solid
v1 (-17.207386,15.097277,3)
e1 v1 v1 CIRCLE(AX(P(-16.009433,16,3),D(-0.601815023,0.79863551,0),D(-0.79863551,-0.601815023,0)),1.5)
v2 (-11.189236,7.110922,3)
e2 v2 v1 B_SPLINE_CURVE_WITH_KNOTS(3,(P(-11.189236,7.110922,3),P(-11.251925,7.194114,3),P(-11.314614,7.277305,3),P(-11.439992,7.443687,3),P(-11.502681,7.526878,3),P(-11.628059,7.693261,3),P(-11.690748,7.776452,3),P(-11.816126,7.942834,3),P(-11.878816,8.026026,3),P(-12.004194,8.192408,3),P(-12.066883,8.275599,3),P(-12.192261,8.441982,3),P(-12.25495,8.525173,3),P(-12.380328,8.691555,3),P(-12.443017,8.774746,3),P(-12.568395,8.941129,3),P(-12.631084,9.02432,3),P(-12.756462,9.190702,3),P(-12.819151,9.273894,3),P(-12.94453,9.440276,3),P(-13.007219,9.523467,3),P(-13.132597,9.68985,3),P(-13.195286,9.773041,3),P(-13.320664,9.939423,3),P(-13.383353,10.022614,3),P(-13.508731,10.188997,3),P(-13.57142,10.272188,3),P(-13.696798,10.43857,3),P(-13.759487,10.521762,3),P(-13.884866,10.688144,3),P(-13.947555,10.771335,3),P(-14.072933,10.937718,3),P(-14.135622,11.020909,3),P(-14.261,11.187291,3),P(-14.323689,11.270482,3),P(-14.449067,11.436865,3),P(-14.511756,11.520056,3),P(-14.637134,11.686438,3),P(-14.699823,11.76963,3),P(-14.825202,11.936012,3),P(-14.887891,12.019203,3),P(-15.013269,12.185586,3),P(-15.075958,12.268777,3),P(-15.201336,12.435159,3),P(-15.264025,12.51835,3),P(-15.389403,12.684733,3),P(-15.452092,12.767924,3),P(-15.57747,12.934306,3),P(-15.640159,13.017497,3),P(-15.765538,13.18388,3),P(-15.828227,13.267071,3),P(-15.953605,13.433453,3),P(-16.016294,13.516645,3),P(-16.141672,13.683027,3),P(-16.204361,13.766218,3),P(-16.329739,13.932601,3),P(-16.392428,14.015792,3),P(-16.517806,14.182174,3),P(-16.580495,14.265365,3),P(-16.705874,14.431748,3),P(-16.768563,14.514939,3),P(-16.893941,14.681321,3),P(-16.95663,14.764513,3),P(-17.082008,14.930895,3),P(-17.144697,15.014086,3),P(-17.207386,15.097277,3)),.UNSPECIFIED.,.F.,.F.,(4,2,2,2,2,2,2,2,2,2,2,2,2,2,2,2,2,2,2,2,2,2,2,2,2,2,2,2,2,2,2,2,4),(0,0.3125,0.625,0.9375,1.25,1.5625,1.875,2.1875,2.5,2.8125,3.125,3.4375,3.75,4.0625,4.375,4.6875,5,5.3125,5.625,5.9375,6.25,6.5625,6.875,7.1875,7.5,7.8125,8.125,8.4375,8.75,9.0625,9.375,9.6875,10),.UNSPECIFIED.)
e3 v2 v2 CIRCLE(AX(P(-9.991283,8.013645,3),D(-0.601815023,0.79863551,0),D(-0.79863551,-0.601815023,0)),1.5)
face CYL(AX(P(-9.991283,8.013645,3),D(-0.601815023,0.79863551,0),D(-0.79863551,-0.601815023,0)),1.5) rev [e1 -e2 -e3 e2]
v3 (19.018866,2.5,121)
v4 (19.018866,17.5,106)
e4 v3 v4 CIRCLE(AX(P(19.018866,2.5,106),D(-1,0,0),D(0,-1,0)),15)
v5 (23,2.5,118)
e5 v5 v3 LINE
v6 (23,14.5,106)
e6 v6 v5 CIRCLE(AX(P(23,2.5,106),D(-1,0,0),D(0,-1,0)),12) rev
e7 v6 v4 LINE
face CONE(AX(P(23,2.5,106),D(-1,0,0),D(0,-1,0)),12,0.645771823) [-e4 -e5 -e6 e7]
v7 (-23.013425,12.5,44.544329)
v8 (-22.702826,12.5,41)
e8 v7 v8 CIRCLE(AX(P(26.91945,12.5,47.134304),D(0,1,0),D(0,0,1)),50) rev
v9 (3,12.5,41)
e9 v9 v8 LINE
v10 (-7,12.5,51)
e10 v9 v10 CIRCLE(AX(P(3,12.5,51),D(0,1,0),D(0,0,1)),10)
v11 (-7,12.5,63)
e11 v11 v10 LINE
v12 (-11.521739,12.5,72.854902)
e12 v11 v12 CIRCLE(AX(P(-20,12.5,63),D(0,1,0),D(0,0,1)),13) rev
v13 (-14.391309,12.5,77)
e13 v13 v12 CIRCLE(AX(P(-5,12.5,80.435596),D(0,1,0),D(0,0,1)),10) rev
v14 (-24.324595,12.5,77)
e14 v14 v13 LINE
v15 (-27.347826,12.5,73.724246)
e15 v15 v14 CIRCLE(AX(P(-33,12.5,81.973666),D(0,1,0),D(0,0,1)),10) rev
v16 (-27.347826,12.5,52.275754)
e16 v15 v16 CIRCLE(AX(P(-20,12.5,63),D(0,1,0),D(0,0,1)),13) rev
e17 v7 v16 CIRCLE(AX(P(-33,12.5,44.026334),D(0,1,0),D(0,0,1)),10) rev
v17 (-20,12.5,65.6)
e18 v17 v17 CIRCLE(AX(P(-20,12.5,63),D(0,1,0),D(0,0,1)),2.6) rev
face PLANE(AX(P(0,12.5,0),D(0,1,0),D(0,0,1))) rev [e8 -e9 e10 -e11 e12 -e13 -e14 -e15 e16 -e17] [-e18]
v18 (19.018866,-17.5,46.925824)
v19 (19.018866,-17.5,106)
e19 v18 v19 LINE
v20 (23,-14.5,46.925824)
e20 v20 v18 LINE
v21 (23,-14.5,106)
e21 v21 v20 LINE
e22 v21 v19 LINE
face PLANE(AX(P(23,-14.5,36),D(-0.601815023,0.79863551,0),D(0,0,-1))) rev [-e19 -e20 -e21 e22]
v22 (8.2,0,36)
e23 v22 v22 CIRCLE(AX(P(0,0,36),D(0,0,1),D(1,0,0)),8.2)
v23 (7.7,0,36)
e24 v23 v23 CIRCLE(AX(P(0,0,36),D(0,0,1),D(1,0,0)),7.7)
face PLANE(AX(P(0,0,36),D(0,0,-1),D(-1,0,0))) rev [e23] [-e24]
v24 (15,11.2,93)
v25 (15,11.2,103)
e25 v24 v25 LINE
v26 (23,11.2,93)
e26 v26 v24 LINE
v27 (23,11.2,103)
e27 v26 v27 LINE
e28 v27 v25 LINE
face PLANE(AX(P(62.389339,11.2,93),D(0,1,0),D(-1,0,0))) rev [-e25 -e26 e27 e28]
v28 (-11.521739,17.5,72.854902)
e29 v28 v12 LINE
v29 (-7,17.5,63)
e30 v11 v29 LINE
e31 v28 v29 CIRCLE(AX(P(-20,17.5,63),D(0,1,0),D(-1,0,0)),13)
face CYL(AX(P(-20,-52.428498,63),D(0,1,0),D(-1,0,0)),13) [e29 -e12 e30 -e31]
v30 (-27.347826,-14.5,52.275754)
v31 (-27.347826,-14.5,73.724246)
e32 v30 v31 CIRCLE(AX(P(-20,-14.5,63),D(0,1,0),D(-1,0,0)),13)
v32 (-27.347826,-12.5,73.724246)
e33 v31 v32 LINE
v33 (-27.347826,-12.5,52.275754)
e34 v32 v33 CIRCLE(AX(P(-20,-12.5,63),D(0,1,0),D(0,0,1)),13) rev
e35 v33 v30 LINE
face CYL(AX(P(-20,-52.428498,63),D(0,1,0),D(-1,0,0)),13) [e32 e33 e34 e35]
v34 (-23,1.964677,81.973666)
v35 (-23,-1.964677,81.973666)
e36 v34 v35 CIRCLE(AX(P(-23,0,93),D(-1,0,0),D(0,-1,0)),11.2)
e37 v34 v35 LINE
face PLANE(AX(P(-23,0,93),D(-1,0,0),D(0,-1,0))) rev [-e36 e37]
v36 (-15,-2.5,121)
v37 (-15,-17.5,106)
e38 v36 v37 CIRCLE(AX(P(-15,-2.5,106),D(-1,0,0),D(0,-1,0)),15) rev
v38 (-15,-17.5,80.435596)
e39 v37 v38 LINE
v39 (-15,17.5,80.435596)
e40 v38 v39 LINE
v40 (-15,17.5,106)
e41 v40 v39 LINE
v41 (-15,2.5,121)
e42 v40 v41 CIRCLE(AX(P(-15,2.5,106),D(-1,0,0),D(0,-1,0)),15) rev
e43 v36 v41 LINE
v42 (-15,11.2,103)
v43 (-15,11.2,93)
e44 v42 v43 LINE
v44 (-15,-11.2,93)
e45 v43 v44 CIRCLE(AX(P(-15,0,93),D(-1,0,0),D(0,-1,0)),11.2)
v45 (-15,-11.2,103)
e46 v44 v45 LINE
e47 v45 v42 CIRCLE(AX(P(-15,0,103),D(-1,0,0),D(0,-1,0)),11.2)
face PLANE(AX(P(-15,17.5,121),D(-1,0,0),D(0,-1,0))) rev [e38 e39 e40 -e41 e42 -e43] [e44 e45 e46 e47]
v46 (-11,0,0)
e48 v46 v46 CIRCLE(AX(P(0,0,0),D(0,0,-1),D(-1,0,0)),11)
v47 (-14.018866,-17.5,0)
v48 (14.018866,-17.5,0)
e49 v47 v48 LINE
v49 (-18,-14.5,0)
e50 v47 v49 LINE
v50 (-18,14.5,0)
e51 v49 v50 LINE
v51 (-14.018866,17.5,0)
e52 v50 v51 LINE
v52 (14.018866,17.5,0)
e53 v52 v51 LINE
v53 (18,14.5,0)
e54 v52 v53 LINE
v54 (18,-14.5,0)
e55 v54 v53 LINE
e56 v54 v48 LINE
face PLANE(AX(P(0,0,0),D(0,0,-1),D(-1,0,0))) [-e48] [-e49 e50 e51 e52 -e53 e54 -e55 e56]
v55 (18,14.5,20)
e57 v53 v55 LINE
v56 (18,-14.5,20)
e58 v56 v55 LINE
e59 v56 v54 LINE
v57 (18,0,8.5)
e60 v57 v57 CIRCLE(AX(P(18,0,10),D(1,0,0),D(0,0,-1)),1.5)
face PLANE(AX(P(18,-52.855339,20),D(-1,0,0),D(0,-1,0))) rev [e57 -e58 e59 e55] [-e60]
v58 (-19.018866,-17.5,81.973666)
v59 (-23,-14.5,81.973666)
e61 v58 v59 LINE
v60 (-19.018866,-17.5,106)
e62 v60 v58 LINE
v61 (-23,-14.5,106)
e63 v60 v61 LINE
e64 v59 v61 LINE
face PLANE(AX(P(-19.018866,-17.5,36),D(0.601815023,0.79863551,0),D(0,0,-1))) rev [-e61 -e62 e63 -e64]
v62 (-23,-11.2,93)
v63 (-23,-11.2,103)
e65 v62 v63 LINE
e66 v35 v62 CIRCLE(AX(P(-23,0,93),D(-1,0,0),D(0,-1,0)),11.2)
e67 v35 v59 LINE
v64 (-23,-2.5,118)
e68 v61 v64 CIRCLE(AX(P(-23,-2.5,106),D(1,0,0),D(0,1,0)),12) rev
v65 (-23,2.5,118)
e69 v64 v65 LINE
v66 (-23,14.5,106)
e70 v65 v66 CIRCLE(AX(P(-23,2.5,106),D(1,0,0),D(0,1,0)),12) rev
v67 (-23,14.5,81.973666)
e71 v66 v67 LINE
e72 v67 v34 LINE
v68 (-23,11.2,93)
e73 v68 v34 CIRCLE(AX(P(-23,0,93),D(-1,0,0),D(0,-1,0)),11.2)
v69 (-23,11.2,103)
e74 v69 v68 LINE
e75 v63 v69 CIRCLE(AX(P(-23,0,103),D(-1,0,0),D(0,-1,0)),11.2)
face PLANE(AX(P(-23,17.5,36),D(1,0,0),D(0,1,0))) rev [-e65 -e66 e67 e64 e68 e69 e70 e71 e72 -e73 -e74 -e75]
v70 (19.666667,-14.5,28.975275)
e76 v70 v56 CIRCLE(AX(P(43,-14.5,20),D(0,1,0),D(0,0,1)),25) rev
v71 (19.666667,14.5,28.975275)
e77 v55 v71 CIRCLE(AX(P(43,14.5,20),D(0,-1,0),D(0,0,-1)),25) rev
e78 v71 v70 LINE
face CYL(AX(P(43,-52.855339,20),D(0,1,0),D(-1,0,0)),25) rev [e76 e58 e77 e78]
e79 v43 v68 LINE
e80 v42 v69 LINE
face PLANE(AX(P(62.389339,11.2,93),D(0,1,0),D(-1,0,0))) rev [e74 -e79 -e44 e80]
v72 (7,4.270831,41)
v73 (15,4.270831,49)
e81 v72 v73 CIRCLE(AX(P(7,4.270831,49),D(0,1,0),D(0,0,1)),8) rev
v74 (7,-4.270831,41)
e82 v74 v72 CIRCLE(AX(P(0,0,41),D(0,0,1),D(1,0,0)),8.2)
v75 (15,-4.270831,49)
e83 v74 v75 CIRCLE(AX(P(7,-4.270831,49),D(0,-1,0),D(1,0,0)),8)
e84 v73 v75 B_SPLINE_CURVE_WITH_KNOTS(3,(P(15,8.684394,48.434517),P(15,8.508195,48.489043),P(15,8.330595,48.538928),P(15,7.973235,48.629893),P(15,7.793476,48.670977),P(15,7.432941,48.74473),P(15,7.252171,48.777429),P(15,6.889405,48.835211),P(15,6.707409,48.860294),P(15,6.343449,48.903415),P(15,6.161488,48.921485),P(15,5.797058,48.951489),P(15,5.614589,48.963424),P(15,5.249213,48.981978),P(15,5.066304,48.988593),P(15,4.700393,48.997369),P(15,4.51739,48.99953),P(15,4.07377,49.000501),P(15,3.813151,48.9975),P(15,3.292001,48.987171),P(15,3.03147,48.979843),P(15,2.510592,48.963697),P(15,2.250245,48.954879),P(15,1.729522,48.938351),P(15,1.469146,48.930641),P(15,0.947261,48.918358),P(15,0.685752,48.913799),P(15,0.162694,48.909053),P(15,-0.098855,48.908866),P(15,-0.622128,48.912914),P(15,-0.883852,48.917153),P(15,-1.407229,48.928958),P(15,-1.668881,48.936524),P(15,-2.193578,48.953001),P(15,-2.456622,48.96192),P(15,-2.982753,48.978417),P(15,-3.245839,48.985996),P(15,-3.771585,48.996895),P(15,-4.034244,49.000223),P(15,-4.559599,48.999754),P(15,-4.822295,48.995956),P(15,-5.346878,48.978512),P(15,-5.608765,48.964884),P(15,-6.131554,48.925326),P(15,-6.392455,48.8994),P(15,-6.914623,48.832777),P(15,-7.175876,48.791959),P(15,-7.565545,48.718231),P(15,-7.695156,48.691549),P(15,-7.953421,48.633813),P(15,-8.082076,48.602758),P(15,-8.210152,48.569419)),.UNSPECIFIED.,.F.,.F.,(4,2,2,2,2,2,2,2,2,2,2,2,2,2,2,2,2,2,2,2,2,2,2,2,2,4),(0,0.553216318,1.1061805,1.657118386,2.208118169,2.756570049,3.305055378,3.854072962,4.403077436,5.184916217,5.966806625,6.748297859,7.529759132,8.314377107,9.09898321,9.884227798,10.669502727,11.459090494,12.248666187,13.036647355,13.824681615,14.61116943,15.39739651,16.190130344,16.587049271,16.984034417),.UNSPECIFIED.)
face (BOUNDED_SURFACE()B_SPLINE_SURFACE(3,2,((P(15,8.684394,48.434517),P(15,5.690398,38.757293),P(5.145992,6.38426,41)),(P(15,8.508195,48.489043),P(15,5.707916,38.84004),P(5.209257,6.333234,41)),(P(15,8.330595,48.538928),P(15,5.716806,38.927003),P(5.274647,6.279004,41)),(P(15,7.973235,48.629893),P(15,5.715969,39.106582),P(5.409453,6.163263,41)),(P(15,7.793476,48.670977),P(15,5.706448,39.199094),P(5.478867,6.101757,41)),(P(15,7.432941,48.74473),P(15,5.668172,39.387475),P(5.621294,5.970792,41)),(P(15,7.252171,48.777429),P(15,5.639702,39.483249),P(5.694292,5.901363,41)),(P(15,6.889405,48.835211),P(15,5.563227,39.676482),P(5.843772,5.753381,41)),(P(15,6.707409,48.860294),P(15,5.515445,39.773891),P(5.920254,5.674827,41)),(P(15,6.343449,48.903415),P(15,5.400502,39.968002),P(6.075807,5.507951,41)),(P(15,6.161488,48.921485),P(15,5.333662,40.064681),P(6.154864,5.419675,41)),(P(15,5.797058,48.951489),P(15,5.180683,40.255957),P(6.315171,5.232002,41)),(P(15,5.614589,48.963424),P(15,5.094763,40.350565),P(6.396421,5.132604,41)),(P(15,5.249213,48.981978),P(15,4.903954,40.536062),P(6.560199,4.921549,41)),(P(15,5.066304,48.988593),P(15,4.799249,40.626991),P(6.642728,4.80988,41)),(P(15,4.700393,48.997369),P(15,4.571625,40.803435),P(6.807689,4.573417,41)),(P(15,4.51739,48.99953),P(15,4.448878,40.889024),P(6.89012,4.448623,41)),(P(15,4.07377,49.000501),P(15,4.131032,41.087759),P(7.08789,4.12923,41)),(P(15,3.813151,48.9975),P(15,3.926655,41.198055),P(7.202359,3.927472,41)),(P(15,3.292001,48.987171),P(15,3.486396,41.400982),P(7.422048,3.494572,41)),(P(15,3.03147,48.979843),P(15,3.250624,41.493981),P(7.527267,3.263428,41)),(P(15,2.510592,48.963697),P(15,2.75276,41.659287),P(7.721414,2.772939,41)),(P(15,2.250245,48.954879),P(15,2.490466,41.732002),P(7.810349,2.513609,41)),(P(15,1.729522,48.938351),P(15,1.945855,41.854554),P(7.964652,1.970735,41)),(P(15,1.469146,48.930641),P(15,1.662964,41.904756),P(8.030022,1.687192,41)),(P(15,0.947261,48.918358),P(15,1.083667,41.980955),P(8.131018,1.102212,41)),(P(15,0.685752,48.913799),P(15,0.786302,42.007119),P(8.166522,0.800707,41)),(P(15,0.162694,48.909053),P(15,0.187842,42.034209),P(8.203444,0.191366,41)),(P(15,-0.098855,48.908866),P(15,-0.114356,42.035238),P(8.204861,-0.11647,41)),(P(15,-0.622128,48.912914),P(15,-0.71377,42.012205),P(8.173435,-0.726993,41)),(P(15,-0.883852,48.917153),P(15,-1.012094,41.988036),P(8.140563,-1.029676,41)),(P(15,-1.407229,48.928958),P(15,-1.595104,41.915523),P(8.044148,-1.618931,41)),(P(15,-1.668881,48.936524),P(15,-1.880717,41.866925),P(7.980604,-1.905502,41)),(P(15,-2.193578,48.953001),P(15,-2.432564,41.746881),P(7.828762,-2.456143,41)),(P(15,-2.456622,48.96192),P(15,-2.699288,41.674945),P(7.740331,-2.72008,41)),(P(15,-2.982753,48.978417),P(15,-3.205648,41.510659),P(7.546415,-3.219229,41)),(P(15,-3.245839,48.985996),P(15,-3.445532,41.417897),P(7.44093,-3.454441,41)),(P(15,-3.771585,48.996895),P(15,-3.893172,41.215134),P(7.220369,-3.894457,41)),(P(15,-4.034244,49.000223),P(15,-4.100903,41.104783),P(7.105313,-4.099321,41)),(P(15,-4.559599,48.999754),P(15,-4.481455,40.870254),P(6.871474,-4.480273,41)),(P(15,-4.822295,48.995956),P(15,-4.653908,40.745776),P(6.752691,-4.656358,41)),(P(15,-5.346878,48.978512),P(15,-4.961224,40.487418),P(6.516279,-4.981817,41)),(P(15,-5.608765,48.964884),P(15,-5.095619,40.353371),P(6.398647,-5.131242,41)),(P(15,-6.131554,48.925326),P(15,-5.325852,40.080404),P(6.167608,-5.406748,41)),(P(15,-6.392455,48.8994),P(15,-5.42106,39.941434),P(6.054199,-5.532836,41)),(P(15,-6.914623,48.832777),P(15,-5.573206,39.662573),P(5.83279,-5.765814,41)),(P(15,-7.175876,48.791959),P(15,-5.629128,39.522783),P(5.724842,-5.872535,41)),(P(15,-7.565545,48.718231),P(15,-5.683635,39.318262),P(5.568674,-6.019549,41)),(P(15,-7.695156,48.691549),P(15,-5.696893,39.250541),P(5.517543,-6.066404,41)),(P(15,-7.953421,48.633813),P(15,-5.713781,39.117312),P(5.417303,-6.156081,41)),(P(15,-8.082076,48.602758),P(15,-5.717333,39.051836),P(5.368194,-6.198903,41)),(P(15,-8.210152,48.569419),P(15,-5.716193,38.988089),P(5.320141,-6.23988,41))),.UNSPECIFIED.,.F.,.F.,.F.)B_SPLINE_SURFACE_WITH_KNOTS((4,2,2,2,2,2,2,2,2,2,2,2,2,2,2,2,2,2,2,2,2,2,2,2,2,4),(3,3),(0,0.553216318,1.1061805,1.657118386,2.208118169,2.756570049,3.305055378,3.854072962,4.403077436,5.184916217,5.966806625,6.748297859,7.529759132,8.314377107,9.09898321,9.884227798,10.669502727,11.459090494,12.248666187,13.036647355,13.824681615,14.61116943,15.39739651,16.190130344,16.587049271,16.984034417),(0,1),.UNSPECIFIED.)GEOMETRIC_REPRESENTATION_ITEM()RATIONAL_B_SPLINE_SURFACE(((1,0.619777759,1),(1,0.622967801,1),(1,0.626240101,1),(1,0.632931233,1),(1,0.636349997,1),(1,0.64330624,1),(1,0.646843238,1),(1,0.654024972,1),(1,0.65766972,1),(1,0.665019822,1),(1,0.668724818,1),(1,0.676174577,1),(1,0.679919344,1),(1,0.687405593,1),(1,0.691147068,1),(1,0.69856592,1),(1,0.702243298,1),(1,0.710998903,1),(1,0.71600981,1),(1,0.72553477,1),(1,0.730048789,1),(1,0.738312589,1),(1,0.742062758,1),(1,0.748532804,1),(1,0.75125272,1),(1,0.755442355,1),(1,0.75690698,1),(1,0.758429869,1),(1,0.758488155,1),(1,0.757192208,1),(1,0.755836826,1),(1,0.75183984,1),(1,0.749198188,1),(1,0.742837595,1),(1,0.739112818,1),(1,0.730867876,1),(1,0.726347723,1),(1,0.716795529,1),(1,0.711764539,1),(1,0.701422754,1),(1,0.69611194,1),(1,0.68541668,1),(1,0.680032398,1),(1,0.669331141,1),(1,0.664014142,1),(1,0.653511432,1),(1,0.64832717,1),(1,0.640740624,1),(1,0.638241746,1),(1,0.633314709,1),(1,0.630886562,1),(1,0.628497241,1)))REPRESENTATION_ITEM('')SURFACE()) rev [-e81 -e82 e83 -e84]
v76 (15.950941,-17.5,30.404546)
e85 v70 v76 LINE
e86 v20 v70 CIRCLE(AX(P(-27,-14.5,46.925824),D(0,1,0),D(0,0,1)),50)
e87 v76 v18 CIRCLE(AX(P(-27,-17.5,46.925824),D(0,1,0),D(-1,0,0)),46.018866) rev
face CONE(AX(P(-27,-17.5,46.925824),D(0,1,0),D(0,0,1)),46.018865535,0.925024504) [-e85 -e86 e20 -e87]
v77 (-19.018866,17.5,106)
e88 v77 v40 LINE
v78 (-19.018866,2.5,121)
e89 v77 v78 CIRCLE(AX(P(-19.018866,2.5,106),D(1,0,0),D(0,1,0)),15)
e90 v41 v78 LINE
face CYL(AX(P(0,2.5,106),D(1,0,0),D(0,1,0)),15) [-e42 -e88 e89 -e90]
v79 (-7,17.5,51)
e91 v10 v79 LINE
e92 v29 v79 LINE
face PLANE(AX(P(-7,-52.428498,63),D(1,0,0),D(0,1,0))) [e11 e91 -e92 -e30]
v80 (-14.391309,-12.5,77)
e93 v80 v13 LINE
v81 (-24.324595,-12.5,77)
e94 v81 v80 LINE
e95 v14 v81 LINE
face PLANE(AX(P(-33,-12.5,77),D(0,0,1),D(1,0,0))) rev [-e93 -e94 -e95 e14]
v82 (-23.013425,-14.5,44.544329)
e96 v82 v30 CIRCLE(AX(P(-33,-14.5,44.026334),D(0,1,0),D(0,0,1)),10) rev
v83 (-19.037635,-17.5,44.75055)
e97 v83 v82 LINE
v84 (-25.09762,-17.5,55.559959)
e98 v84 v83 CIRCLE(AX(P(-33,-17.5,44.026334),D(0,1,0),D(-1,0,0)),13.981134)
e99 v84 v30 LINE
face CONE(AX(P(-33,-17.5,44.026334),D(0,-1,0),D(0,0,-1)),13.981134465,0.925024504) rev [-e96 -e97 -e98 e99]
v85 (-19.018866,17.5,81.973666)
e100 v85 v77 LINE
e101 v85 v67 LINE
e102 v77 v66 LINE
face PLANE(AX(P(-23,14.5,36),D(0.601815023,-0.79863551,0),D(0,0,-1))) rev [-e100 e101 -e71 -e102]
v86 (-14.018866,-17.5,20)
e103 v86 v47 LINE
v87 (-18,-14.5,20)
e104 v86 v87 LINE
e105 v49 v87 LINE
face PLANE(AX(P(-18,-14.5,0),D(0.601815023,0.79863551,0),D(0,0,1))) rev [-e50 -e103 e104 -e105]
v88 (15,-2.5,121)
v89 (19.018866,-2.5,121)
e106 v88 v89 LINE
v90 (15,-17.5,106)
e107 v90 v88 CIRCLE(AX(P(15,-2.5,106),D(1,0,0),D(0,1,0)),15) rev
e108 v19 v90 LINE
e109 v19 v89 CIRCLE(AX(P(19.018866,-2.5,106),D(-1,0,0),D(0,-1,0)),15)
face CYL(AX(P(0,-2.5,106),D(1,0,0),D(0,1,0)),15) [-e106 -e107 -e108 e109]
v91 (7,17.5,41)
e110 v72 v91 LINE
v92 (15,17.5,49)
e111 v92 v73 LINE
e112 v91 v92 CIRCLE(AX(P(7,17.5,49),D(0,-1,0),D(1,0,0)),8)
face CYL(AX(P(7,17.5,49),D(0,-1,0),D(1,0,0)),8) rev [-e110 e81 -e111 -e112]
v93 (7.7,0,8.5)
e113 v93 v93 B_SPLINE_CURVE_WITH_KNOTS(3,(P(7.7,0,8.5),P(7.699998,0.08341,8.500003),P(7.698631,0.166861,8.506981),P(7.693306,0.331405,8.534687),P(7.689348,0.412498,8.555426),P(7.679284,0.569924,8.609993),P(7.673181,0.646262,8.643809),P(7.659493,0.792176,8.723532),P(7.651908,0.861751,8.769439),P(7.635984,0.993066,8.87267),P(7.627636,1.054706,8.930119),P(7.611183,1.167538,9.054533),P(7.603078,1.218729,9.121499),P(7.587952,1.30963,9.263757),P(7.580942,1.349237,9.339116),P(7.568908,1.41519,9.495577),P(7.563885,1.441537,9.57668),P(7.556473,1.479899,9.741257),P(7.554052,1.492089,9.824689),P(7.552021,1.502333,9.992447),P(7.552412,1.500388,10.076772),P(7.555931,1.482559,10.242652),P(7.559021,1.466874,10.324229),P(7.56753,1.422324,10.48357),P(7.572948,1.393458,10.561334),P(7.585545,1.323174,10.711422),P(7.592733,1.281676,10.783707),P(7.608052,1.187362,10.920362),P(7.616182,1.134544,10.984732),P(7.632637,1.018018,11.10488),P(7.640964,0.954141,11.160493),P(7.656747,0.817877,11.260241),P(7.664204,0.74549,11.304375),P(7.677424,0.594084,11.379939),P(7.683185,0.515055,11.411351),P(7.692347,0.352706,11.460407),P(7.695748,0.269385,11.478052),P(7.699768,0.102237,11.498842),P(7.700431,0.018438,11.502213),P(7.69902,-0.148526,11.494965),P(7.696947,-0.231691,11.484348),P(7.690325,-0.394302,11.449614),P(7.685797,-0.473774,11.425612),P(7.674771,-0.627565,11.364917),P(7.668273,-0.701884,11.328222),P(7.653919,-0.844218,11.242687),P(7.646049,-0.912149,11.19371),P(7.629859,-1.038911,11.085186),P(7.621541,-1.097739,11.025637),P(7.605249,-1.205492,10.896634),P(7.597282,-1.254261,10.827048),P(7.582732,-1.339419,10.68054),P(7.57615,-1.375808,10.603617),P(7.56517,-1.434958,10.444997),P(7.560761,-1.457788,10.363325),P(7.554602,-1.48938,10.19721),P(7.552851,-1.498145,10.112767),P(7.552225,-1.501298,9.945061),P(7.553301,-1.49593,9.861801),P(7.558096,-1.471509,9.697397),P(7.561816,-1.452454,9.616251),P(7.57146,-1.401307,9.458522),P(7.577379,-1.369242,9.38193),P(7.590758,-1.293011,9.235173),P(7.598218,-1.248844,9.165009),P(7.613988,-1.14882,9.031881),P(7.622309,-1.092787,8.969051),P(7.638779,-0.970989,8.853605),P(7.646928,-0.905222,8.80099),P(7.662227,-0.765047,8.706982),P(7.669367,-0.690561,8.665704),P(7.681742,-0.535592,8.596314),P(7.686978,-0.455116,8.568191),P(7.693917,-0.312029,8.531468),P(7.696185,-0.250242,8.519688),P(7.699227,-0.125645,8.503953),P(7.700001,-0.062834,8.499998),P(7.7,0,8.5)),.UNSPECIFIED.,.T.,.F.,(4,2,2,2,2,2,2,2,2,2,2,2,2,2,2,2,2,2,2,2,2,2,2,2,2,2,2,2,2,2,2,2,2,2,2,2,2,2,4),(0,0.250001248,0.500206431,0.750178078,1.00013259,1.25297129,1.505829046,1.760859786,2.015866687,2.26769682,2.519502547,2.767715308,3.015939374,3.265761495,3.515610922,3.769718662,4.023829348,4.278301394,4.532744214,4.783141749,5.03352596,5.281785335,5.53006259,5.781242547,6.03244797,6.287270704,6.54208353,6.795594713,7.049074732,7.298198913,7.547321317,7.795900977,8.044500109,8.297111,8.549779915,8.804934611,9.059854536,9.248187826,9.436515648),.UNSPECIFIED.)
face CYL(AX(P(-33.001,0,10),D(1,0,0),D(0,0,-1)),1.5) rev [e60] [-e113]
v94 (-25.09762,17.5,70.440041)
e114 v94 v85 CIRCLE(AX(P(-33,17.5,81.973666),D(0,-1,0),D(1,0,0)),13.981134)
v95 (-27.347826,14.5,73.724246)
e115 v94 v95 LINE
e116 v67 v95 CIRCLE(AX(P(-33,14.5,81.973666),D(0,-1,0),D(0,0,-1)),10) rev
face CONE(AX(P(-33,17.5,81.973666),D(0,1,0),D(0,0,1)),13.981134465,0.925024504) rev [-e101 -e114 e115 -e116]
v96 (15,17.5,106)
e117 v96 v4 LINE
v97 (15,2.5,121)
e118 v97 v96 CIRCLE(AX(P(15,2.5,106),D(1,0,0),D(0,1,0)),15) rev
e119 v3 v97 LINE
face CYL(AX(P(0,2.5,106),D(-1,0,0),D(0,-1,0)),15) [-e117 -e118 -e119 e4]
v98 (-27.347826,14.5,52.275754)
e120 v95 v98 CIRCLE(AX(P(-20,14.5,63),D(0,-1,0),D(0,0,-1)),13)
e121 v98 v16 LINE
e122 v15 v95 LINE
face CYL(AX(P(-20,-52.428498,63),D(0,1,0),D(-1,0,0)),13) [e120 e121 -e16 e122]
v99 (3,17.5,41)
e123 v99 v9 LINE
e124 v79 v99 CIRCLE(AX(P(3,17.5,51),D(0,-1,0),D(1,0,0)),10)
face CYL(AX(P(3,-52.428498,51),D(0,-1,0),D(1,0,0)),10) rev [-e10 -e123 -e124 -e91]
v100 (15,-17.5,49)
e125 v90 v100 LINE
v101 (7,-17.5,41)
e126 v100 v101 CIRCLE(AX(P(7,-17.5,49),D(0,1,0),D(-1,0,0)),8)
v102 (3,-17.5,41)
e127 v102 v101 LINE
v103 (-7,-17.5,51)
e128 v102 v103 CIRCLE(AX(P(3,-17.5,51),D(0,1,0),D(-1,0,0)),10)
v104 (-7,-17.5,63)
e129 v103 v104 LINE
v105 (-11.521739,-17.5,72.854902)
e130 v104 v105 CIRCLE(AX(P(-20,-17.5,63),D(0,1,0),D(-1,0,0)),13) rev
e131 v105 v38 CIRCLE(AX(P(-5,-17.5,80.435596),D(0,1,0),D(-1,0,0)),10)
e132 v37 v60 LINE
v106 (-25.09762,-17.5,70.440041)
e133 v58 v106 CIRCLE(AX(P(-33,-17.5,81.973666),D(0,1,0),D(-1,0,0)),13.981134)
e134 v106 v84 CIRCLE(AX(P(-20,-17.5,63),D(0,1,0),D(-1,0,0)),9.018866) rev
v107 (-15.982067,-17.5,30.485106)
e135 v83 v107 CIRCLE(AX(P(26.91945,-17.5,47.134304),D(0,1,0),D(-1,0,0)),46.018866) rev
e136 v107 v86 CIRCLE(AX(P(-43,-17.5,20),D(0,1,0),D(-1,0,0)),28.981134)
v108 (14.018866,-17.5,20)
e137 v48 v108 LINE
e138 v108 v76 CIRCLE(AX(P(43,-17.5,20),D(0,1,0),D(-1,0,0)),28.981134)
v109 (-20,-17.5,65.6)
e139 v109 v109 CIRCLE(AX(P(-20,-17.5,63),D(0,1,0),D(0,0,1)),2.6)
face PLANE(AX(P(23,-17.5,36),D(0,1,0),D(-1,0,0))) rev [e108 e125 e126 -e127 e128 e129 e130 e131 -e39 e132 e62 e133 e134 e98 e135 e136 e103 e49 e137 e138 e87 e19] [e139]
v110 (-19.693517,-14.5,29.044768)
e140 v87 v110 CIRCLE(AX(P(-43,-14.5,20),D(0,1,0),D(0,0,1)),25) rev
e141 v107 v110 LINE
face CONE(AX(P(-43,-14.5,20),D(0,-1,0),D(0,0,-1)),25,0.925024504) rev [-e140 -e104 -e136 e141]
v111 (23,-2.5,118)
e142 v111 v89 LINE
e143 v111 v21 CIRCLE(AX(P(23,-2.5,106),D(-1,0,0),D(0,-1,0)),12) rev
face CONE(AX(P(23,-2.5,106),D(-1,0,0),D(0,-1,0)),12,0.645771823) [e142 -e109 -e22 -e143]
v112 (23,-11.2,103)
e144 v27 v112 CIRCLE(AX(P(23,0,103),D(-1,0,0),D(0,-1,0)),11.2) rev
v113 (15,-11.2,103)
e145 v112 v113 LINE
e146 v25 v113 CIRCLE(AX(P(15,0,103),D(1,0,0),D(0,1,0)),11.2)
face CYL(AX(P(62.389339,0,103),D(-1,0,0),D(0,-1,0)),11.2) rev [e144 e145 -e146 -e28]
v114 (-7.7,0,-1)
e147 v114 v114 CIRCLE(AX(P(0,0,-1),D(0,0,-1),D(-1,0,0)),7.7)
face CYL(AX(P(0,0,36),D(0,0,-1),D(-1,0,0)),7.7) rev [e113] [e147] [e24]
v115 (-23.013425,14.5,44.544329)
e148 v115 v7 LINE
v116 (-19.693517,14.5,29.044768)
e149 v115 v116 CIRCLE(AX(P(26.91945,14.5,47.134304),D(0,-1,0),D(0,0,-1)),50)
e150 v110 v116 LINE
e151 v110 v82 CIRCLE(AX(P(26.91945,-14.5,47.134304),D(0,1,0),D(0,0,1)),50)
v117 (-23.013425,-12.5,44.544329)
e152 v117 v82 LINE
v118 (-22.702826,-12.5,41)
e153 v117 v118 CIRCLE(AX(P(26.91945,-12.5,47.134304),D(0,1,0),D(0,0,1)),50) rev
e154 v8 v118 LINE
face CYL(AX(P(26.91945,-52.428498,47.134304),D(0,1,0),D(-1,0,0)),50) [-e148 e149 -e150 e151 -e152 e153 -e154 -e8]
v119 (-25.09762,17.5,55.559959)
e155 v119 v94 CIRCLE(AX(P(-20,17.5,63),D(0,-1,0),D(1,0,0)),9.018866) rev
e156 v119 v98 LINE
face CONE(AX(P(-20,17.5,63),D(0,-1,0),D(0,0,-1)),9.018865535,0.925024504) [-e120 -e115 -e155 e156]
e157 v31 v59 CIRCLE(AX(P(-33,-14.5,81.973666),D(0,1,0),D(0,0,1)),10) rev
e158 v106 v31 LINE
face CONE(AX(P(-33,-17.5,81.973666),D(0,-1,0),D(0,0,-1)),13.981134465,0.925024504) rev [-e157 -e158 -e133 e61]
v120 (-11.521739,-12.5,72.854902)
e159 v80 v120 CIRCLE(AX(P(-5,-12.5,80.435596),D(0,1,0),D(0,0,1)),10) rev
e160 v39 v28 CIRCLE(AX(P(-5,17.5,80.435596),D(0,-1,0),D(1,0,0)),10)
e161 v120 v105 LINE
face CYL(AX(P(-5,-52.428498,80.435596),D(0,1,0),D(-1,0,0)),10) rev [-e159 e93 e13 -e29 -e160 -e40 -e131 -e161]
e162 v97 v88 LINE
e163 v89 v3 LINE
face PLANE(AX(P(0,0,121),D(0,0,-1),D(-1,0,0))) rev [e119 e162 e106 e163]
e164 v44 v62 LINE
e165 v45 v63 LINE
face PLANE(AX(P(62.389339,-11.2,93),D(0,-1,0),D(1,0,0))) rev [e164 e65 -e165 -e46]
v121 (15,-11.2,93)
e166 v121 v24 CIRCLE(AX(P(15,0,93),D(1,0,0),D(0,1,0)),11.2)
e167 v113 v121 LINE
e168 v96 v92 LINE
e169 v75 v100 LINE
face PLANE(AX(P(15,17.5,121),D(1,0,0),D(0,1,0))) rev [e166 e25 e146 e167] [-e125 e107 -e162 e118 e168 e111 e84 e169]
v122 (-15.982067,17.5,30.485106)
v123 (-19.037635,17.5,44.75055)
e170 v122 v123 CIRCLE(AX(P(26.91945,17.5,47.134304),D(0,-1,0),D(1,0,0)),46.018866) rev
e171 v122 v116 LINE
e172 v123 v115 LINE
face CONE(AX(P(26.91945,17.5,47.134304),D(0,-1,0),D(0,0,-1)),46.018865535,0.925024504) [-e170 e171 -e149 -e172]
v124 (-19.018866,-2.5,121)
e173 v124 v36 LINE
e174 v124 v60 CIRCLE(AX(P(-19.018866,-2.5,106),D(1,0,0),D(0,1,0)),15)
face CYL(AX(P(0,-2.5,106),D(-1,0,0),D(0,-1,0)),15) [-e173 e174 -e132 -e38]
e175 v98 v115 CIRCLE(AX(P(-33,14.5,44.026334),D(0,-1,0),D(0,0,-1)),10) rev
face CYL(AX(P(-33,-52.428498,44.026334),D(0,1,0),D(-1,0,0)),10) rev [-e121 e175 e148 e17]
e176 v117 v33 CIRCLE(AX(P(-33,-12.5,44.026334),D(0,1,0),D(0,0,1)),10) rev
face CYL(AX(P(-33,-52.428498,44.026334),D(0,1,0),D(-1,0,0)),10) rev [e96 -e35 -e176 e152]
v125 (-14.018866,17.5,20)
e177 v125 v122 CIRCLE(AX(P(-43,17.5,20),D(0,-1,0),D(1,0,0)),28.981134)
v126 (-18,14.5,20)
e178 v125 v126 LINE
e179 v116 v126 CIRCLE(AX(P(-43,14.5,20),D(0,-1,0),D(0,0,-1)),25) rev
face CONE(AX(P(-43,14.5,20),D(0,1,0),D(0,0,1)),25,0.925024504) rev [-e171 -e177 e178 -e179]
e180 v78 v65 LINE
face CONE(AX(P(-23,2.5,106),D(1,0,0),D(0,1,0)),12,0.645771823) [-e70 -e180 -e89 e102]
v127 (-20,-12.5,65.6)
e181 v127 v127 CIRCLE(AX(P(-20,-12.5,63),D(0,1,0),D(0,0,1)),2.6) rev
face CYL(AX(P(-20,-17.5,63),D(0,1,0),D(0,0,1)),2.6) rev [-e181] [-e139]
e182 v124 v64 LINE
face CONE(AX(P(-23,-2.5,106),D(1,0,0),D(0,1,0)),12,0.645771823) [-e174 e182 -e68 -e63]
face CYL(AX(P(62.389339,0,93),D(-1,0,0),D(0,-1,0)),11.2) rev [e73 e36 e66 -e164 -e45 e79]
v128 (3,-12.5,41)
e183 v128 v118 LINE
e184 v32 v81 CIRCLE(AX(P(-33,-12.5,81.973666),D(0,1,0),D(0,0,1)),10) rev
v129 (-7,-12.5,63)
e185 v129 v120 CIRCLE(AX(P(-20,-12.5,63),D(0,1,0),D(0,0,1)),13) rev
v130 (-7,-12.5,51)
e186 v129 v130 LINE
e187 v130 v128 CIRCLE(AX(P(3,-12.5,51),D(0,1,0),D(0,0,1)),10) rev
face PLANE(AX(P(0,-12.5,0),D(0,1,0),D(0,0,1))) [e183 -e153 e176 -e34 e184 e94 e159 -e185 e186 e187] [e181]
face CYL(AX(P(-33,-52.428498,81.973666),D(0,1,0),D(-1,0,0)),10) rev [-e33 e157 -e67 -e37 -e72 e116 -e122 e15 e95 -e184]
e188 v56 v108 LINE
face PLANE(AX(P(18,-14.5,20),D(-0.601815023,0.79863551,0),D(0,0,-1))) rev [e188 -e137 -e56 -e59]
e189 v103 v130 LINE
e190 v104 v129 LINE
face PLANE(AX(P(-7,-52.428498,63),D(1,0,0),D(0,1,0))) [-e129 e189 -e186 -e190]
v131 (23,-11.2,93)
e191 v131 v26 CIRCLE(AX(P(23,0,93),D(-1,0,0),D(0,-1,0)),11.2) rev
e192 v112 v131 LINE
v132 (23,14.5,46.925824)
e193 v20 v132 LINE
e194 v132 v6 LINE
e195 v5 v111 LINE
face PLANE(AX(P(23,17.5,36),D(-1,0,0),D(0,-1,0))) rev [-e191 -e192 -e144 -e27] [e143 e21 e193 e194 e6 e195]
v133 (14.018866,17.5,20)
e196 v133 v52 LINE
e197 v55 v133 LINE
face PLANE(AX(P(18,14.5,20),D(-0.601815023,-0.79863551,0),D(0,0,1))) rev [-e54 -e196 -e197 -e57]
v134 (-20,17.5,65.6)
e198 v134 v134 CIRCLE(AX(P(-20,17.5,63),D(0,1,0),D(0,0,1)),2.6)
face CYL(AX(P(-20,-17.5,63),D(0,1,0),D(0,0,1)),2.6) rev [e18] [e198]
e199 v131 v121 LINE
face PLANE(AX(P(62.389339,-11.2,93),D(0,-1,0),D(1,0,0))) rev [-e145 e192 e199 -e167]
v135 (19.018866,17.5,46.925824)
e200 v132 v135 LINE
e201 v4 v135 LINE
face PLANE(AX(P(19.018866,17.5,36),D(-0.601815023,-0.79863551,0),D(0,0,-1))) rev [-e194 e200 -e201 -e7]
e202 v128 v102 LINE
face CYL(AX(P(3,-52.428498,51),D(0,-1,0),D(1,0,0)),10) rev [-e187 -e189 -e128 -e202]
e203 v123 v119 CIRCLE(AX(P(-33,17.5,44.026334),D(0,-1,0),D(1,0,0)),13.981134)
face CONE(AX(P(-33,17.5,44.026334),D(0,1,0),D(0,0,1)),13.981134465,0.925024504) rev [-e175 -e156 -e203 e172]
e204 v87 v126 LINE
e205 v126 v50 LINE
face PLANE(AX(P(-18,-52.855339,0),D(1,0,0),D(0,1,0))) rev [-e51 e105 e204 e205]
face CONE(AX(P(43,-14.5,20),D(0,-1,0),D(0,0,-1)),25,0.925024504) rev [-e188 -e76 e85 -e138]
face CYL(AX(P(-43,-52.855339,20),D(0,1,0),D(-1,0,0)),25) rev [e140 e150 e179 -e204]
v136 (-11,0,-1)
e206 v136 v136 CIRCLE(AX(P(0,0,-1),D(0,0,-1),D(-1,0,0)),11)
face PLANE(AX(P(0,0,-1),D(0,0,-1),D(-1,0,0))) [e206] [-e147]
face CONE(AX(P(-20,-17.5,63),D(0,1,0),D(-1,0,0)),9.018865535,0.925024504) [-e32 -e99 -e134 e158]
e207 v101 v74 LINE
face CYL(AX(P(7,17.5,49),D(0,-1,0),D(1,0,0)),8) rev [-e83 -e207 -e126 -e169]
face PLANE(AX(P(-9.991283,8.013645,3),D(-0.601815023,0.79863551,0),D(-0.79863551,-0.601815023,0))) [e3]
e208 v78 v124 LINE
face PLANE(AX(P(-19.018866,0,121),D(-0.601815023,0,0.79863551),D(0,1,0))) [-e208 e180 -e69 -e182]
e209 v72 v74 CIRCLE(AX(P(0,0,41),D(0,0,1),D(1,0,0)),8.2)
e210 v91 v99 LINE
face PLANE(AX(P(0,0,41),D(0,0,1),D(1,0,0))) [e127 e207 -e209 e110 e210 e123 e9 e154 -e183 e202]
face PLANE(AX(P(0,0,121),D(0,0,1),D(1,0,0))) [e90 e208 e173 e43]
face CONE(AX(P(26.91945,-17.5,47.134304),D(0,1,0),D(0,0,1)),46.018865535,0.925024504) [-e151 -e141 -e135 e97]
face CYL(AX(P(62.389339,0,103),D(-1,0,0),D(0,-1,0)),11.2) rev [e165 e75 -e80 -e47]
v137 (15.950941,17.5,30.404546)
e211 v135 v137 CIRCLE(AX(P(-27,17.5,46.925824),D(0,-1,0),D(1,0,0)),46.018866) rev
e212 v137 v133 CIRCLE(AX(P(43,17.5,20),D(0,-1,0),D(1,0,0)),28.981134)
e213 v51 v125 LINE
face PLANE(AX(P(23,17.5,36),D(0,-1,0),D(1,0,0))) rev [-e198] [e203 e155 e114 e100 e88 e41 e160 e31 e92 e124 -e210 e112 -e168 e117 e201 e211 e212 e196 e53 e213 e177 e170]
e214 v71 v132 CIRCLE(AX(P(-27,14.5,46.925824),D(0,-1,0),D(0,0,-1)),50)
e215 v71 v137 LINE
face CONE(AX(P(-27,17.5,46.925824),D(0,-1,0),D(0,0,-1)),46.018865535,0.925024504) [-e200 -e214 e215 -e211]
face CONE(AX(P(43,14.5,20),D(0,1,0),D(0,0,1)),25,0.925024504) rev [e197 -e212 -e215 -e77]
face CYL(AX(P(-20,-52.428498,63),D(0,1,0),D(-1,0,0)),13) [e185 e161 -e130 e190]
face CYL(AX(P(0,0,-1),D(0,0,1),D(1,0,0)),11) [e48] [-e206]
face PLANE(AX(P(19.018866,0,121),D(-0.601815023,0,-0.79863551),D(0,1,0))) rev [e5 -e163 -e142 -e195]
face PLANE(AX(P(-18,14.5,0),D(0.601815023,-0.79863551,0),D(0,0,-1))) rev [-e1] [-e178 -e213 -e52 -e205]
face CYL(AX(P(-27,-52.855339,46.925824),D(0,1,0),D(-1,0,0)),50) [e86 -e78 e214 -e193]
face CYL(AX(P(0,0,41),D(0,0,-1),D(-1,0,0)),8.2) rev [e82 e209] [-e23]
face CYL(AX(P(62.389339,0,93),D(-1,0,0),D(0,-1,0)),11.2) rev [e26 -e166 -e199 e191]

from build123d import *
from OCP.BRepFilletAPI import BRepFilletAPI_MakeChamfer
from build123d.topology import SkipClean

# Parameters (mm, degrees)
SKETCH1_W               = 46
SKETCH1_H               = 35
SKETCH1_R               = 7.7
BOSS_EXTRUDE1_DEPTH     = 36
BOSS_EXTRUDE2_START     = 1
SKETCH2_R               = 11
SKETCH2_R_2             = 7.7
BOSS_EXTRUDE2_DEPTH     = 1
SKETCH5_W               = 8
SKETCH5_H               = 35
BOSS_EXTRUDE4_DEPTH     = 85
SKETCH3_W               = 38
SKETCH3_H               = 35
SKETCH3_R               = 8.2
BOSS_EXTRUDE3_DEPTH     = 5
CUT_EXTRUDE1_DEPTH      = 125.403577119
CUT_EXTRUDE1_DEPTH_BACK = 125.403577119
SKETCH4_R               = 2.6
BOSS_EXTRUDE6_REACH     = 130.043
SKETCH9_W               = 8
SKETCH9_H               = 35
BOSS_EXTRUDE5_DEPTH     = 80
FILLET1_R               = 15
FILLET9_R               = 10
FILLET11_R              = 8
CUT_EXTRUDE2_DEPTH      = 35
FILLET12_R              = 50
SKETCH6_W               = 26
SKETCH6_H               = 36
CUT_EXTRUDE3_DEPTH      = 12.5
FILLET13_R              = 10
CUT_EXTRUDE4_REACH      = 132.626
CHAMFER1_SIZE           = 3
CHAMFER1_SIZE2          = 3.981134465
CUT_EXTRUDE5_REACH      = 134.47
CUT_EXTRUDE5_END_RADIUS = 7.7
SKETCH23_R              = 1.5
SKETCH25_R              = 1.5
CUT_EXTRUDE6_DEPTH      = 10


with BuildPart() as part:
    # Sketch1 → Boss-Extrude1 (new body)
    with BuildSketch(Plane.XY):
        Rectangle(SKETCH1_W, SKETCH1_H)
        Circle(SKETCH1_R, mode=Mode.SUBTRACT)
    extrude(amount=BOSS_EXTRUDE1_DEPTH)

    # Sketch2 → Boss-Extrude2 (add)
    with SkipClean():  # the faces are left unmerged after this step: merging them gives an invalid solid
        with BuildSketch(Plane(origin=(0, 0, 0), x_dir=(-1, 0, 0), z_dir=(0, 0, -1)).offset(BOSS_EXTRUDE2_START)):
            Circle(SKETCH2_R)
            Circle(SKETCH2_R_2, mode=Mode.SUBTRACT)
        extrude(amount=-BOSS_EXTRUDE2_DEPTH)

    # Sketch5 → Boss-Extrude4 (add)
    with SkipClean():  # the faces are left unmerged after this step: merging them gives an invalid solid
        with BuildSketch(Plane.XY.offset(36)):
            with Locations((-19, 0)):
                Rectangle(SKETCH5_W, SKETCH5_H)
        extrude(amount=BOSS_EXTRUDE4_DEPTH)

    # Sketch3 → Boss-Extrude3 (add)
    with BuildSketch(Plane.XY.offset(36)):
        with Locations((4, 0)):
            Rectangle(SKETCH3_W, SKETCH3_H)
        Circle(SKETCH3_R, mode=Mode.SUBTRACT)
    extrude(amount=BOSS_EXTRUDE3_DEPTH)

    # Sketch4 → Cut-Extrude1 (cut, two sides: drawn at the far end of the back side and taken through both)
    with BuildSketch(Plane(origin=(0, 0, 0), x_dir=(1, 0, 0), z_dir=(0, 1, 0)).offset(-CUT_EXTRUDE1_DEPTH_BACK)):
        with Locations(Location((-20, -63, 0), (0, 0, 270))):
            Circle(SKETCH4_R)
    extrude(amount=CUT_EXTRUDE1_DEPTH + CUT_EXTRUDE1_DEPTH_BACK, mode=Mode.SUBTRACT)

    # Boss-Extrude6: up to this face of the body (flat: up to its plane)
    boss_extrude6_end = Plane(part.part.faces().sort_by_distance((-4.685176782, -17.5, 35.598204078))[0])
    # Sketch10 → Boss-Extrude6 (add, up to the picked face)
    with BuildSketch(Plane(origin=(0, 17.5, 0), x_dir=(1, 0, 0), z_dir=(0, 1, 0)), mode=Mode.PRIVATE) as boss_extrude6_sk1:
        with BuildLine():
            Line((-23, -50.350889359), (-23, -75.649110641))
            ThreePointArc((-23, -75.649110641), (-33, -63), (-23, -50.350889359))
        make_face()
    boss_extrude6_tool1 = split(extrude(boss_extrude6_sk1.sketch, amount=-BOSS_EXTRUDE6_REACH, mode=Mode.PRIVATE), bisect_by=boss_extrude6_end, keep=Keep.BOTH, mode=Mode.PRIVATE)
    # Sketch10 → Boss-Extrude6 (add, up to the picked face)
    with BuildSketch(Plane(origin=(0, 17.5, 0), x_dir=(1, 0, 0), z_dir=(0, 1, 0)), mode=Mode.PRIVATE) as boss_extrude6_sk2:
        with BuildLine():
            Line((-15, -41), (-15, -75))
            ThreePointArc((-15, -75), (-9.183346174, -70.211102551), (-7, -63))
            Line((-7, -63), (-7, -41))
            Line((-7, -41), (-15, -41))
        make_face()
    boss_extrude6_tool2 = split(extrude(boss_extrude6_sk2.sketch, amount=-BOSS_EXTRUDE6_REACH, mode=Mode.PRIVATE), bisect_by=boss_extrude6_end, keep=Keep.BOTH, mode=Mode.PRIVATE)
    add(boss_extrude6_tool1.solids().sort_by(Axis((-27.170601, 17.5, 63), (0, -1, 0)))[0])
    add(boss_extrude6_tool2.solids().sort_by(Axis((-11.197055, 17.5, 56.457565), (0, -1, 0)))[0])

    # Sketch9 → Boss-Extrude5 (add)
    with BuildSketch(Plane.XY.offset(41)):
        with Locations((19, 0)):
            Rectangle(SKETCH9_W, SKETCH9_H)
    extrude(amount=BOSS_EXTRUDE5_DEPTH)

    # Fillet1
    fillet1_edges = [part.edges().sort_by_distance(p)[0] for p in [
        (-19, -17.5, 121),
        (-19, 17.5, 121),
        (19, 17.5, 121),
        (19, -17.5, 121),
    ]]
    fillet(fillet1_edges, radius=FILLET1_R)

    # Fillet9
    fillet9_edges = [part.edges().sort_by_distance(p)[0] for p in [
        (-23, 0, 75.649110641),
        (-23, 0, 50.350889359),
        (-15, 0, 75),
    ]]
    fillet(fillet9_edges, radius=FILLET9_R)

    # Fillet11
    fillet11_edges = [part.edges().sort_by_distance(p)[0] for p in [
        (15, 0, 41),
    ]]
    fillet(fillet11_edges, radius=FILLET11_R)

    # Sketch20 → Cut-Extrude2 (cut)
    with BuildSketch(Plane(origin=(0, 17.5, 0), x_dir=(1, 0, 0), z_dir=(0, 1, 0))):
        with BuildLine():
            Line((-18, 0), (-18, -20))
            ThreePointArc((-18, -20), (-19.282917549, -27.90569415), (-23, -35))
            Line((-23, -35), (-23, 0))
            Line((-23, 0), (-18, 0))
        make_face()
        with BuildLine():
            Line((18, -20), (18, 0))
            Line((18, 0), (23, 0))
            Line((23, 0), (23, -35))
            ThreePointArc((23, -35), (19.282917549, -27.90569415), (18, -20))
        make_face()
    extrude(amount=-CUT_EXTRUDE2_DEPTH, mode=Mode.SUBTRACT)

    # Fillet12
    # the kernel refuses this fillet: 50 mm, written as the material it takes off along each edge
    with BuildSketch(Plane(origin=(23, 47.314560089, 35), x_dir=(0, 0, 1), z_dir=(0, -1, 0))) as fillet12_piece_1:
        with BuildLine():
            CenterArc((11.925824036, 50), FILLET12_R, 248.960530219, 21.039469781)
            ThreePointArc((-6.024725321, 3.333333333), (-2.897057104, 1.87507196), (0, 0))
            Line((0, 0), (11.925824036, 0))
        make_face()
    extrude(amount=94.629120178, mode=Mode.SUBTRACT)
    with BuildSketch(Plane(origin=(-23, 41.360846345, 35), x_dir=(0.4854209335921463, 0, -0.8742805712301568), z_dir=(0, -1, 0))) as fillet12_piece_2:
        with BuildLine():
            CenterArc((13.623159586, 49.533850857), FILLET12_R, 243.929167388, 18.240989477)
            Line((-8.350938249, 4.621279963), (-10.548348032, 0.130022873))
            ThreePointArc((-10.548348032, 0.130022873), (-10.318653148, 0.01016864), (-2.427104668, -4.371402856))
            Line((-2.427104668, -4.371402856), (0.681157979, -4.953385086))
            ThreePointArc((0.681157979, -4.953385086), (3.405789897, -4.766925428), (6.130421814, -4.953385086))
            Line((6.130421814, -4.953385086), (6.811579793, 0))
        make_face()
    extrude(amount=82.721692689, mode=Mode.SUBTRACT)

    # Sketch6 → Cut-Extrude3 (cut, symmetric)
    with BuildSketch(Plane(origin=(0, 0, 0), x_dir=(1, 0, 0), z_dir=(0, 1, 0))):
        with Locations((-20, -59)):
            Rectangle(SKETCH6_W, SKETCH6_H)
    extrude(amount=CUT_EXTRUDE3_DEPTH, both=True, mode=Mode.SUBTRACT)

    # Fillet13
    fillet13_edges = [part.edges().sort_by_distance(p)[0] for p in [
        (-7, 15, 41),
        (-7, -15, 41),
    ]]
    fillet(fillet13_edges, radius=FILLET13_R)

    # Cut-Extrude4: up to this face of the body (flat: up to its plane)
    cut_extrude4_end = Plane(part.part.faces().sort_by_distance((23, 0, 82.65958398))[0])
    # Sketch22 → Cut-Extrude4 (cut, up to the picked face)
    with BuildSketch(Plane.ZY.offset(23), mode=Mode.PRIVATE) as cut_extrude4_sk1:
        with BuildLine():
            Line((93, 11.2), (103, 11.2))
            ThreePointArc((103, 11.2), (114.2, 0), (103, -11.2))
            Line((103, -11.2), (93, -11.2))
            ThreePointArc((93, -11.2), (81.8, 0), (93, 11.2))
        make_face()
    cut_extrude4_tool1 = split(extrude(cut_extrude4_sk1.sketch, amount=-CUT_EXTRUDE4_REACH, mode=Mode.PRIVATE), bisect_by=cut_extrude4_end, keep=Keep.BOTH, mode=Mode.PRIVATE)
    add(cut_extrude4_tool1.solids().sort_by(Axis((-23, 0, 98), (1, 0, 0)))[0], mode=Mode.SUBTRACT)

    # Chamfer1: one chamfer whose edges measure the first distance from different faces: ONE call of the kernel's chamfer builder (chamfer() names one face for all edges)
    chamfer1_edges_1 = [part.edges().sort_by_distance(p)[0] for p in [
        (-23, 17.5, 93.986832981),
        (-23, 0, 121),
        (-23, 13.106601718, 116.606601718),
        (-23, -13.106601718, 116.606601718),
        (-23, -17.5, 93.986832981),
    ]]
    chamfer1_side_1 = [part.faces().sort_by_distance(p)[0] for p in [
        (-23, -16.975781081, 93.986832981),
    ]]
    chamfer1_edges_2 = [part.edges().sort_by_distance(p)[0] for p in [
        (-33, -17.5, 63),
    ]]
    chamfer1_side_2 = [part.faces().sort_by_distance(p)[0] for p in [
        (-33, -15, 63),
    ]]
    chamfer1_edges_3 = [part.edges().sort_by_distance(p)[0] for p in [
        (-33, 17.5, 63),
    ]]
    chamfer1_side_3 = [part.faces().sort_by_distance(p)[0] for p in [
        (-33, 15, 63),
    ]]
    chamfer1_edges_4 = [part.edges().sort_by_distance(p)[0] for p in [
        (-24.277251002, -17.5, 48.916492514),
    ]]
    chamfer1_side_4 = [part.faces().sort_by_distance(p)[0] for p in [
        (-24.277251002, -15, 48.916492514),
    ]]
    chamfer1_edges_5 = [part.edges().sort_by_distance(p)[0] for p in [
        (-24.153482631, 17.5, 77.31114192),
        (-24.153482631, -17.5, 77.31114192),
    ]]
    chamfer1_side_5 = [part.faces().sort_by_distance(p)[0] for p in [
        (-24.153482631, 0, 77.31114192),
    ]]
    chamfer1_edges_6 = [part.edges().sort_by_distance(p)[0] for p in [
        (-18, 17.5, 10),
        (-18, -17.5, 10),
    ]]
    chamfer1_side_6 = [part.faces().sort_by_distance(p)[0] for p in [
        (-18, 0, 10),
    ]]
    chamfer1_edges_7 = [part.edges().sort_by_distance(p)[0] for p in [
        (-18.427026171, -17.5, 24.600973508),
        (-18.427026171, 17.5, 24.600973508),
    ]]
    chamfer1_side_7 = [part.faces().sort_by_distance(p)[0] for p in [
        (-18.427026171, 0, 24.600973508),
    ]]
    chamfer1_edges_8 = [part.edges().sort_by_distance(p)[0] for p in [
        (18.420197994, 17.5, 24.564354646),
        (18.420197994, -17.5, 24.564354646),
    ]]
    chamfer1_side_8 = [part.faces().sort_by_distance(p)[0] for p in [
        (18.420197994, 0, 24.564354646),
    ]]
    chamfer1_edges_9 = [part.edges().sort_by_distance(p)[0] for p in [
        (18, 17.5, 10),
        (18, -17.5, 10),
    ]]
    chamfer1_side_9 = [part.faces().sort_by_distance(p)[0] for p in [
        (18, 0, 10),
    ]]
    chamfer1_edges_10 = [part.edges().sort_by_distance(p)[0] for p in [
        (-24.277251002, 17.5, 48.916492514),
    ]]
    chamfer1_side_10 = [part.faces().sort_by_distance(p)[0] for p in [
        (-24.277251002, 15, 48.916492514),
    ]]
    chamfer1_edges_11 = [part.edges().sort_by_distance(p)[0] for p in [
        (-21.971591885, 17.5, 36.66215096),
        (-21.971591885, -17.5, 36.66215096),
    ]]
    chamfer1_side_11 = [part.faces().sort_by_distance(p)[0] for p in [
        (-21.971591885, 0, 36.66215096),
    ]]
    chamfer1_edges_12 = [part.edges().sort_by_distance(p)[0] for p in [
        (22.159604013, 17.5, 37.797114744),
        (22.159604013, -17.5, 37.797114744),
    ]]
    chamfer1_side_12 = [part.faces().sort_by_distance(p)[0] for p in [
        (22.159604013, 0, 37.797114744),
    ]]
    chamfer1_edges_13 = [part.edges().sort_by_distance(p)[0] for p in [
        (23, 0, 121),
        (23, 17.5, 76.462912018),
        (23, -17.5, 76.462912018),
        (23, 13.106601718, 116.606601718),
        (23, -13.106601718, 116.606601718),
    ]]
    chamfer1_side_13 = [part.faces().sort_by_distance(p)[0] for p in [
        (23, 0, 77.610644397),
    ]]
    chamfer1 = BRepFilletAPI_MakeChamfer(part.part.solid().wrapped)
    for e in chamfer1_edges_1:
        chamfer1.Add(CHAMFER1_SIZE, CHAMFER1_SIZE2, e.wrapped, chamfer1_side_1[0].wrapped)  # the first distance lies on this face
    for e in chamfer1_edges_2:
        chamfer1.Add(CHAMFER1_SIZE, CHAMFER1_SIZE2, e.wrapped, chamfer1_side_2[0].wrapped)  # the first distance lies on this face
    for e in chamfer1_edges_3:
        chamfer1.Add(CHAMFER1_SIZE, CHAMFER1_SIZE2, e.wrapped, chamfer1_side_3[0].wrapped)  # the first distance lies on this face
    for e in chamfer1_edges_4:
        chamfer1.Add(CHAMFER1_SIZE, CHAMFER1_SIZE2, e.wrapped, chamfer1_side_4[0].wrapped)  # the first distance lies on this face
    for e in chamfer1_edges_5:
        chamfer1.Add(CHAMFER1_SIZE, CHAMFER1_SIZE2, e.wrapped, chamfer1_side_5[0].wrapped)  # the first distance lies on this face
    for e in chamfer1_edges_6:
        chamfer1.Add(CHAMFER1_SIZE, CHAMFER1_SIZE2, e.wrapped, chamfer1_side_6[0].wrapped)  # the first distance lies on this face
    for e in chamfer1_edges_7:
        chamfer1.Add(CHAMFER1_SIZE, CHAMFER1_SIZE2, e.wrapped, chamfer1_side_7[0].wrapped)  # the first distance lies on this face
    for e in chamfer1_edges_8:
        chamfer1.Add(CHAMFER1_SIZE, CHAMFER1_SIZE2, e.wrapped, chamfer1_side_8[0].wrapped)  # the first distance lies on this face
    for e in chamfer1_edges_9:
        chamfer1.Add(CHAMFER1_SIZE, CHAMFER1_SIZE2, e.wrapped, chamfer1_side_9[0].wrapped)  # the first distance lies on this face
    for e in chamfer1_edges_10:
        chamfer1.Add(CHAMFER1_SIZE, CHAMFER1_SIZE2, e.wrapped, chamfer1_side_10[0].wrapped)  # the first distance lies on this face
    for e in chamfer1_edges_11:
        chamfer1.Add(CHAMFER1_SIZE, CHAMFER1_SIZE2, e.wrapped, chamfer1_side_11[0].wrapped)  # the first distance lies on this face
    for e in chamfer1_edges_12:
        chamfer1.Add(CHAMFER1_SIZE, CHAMFER1_SIZE2, e.wrapped, chamfer1_side_12[0].wrapped)  # the first distance lies on this face
    for e in chamfer1_edges_13:
        chamfer1.Add(CHAMFER1_SIZE, CHAMFER1_SIZE2, e.wrapped, chamfer1_side_13[0].wrapped)  # the first distance lies on this face
    add(Compound.cast(chamfer1.Shape()), mode=Mode.REPLACE)

    # Cut-Extrude5: up to this cylinder (the profile starts outside it)
    cut_extrude5_end = Plane(origin=(0, 0, 10), z_dir=(0, 0, -1)) * Cylinder(CUT_EXTRUDE5_END_RADIUS, 285.34, mode=Mode.PRIVATE)
    # Sketch23 → Cut-Extrude5 (cut, up to the surface)
    with BuildSketch(Plane(origin=(18, 0, 0), x_dir=(0, 0, -1), z_dir=(1, 0, 0)), mode=Mode.PRIVATE) as cut_extrude5_sk1:
        with Locations((-10, 0)):
            Circle(SKETCH23_R)
    cut_extrude5_tool1 = extrude(cut_extrude5_sk1.sketch, amount=-CUT_EXTRUDE5_REACH, mode=Mode.PRIVATE) - cut_extrude5_end
    add(cut_extrude5_tool1.solids().sort_by_distance((18, 0, 10))[0], mode=Mode.SUBTRACT)

    # Sketch25 → Cut-Extrude6 (cut)
    with BuildSketch(Plane(origin=(-13.488411093, 17.899726093, 0), x_dir=(0.7986355100472918, 0.6018150231520498, 0), z_dir=(-0.6018150231520497, 0.7986355100472917, 0))):
        with Locations(Location((-3.156661133, -3, 0), (0, 0, 180))):
            Circle(SKETCH25_R)
    extrude(amount=-CUT_EXTRUDE6_DEPTH, mode=Mode.SUBTRACT)


solid = part.part
